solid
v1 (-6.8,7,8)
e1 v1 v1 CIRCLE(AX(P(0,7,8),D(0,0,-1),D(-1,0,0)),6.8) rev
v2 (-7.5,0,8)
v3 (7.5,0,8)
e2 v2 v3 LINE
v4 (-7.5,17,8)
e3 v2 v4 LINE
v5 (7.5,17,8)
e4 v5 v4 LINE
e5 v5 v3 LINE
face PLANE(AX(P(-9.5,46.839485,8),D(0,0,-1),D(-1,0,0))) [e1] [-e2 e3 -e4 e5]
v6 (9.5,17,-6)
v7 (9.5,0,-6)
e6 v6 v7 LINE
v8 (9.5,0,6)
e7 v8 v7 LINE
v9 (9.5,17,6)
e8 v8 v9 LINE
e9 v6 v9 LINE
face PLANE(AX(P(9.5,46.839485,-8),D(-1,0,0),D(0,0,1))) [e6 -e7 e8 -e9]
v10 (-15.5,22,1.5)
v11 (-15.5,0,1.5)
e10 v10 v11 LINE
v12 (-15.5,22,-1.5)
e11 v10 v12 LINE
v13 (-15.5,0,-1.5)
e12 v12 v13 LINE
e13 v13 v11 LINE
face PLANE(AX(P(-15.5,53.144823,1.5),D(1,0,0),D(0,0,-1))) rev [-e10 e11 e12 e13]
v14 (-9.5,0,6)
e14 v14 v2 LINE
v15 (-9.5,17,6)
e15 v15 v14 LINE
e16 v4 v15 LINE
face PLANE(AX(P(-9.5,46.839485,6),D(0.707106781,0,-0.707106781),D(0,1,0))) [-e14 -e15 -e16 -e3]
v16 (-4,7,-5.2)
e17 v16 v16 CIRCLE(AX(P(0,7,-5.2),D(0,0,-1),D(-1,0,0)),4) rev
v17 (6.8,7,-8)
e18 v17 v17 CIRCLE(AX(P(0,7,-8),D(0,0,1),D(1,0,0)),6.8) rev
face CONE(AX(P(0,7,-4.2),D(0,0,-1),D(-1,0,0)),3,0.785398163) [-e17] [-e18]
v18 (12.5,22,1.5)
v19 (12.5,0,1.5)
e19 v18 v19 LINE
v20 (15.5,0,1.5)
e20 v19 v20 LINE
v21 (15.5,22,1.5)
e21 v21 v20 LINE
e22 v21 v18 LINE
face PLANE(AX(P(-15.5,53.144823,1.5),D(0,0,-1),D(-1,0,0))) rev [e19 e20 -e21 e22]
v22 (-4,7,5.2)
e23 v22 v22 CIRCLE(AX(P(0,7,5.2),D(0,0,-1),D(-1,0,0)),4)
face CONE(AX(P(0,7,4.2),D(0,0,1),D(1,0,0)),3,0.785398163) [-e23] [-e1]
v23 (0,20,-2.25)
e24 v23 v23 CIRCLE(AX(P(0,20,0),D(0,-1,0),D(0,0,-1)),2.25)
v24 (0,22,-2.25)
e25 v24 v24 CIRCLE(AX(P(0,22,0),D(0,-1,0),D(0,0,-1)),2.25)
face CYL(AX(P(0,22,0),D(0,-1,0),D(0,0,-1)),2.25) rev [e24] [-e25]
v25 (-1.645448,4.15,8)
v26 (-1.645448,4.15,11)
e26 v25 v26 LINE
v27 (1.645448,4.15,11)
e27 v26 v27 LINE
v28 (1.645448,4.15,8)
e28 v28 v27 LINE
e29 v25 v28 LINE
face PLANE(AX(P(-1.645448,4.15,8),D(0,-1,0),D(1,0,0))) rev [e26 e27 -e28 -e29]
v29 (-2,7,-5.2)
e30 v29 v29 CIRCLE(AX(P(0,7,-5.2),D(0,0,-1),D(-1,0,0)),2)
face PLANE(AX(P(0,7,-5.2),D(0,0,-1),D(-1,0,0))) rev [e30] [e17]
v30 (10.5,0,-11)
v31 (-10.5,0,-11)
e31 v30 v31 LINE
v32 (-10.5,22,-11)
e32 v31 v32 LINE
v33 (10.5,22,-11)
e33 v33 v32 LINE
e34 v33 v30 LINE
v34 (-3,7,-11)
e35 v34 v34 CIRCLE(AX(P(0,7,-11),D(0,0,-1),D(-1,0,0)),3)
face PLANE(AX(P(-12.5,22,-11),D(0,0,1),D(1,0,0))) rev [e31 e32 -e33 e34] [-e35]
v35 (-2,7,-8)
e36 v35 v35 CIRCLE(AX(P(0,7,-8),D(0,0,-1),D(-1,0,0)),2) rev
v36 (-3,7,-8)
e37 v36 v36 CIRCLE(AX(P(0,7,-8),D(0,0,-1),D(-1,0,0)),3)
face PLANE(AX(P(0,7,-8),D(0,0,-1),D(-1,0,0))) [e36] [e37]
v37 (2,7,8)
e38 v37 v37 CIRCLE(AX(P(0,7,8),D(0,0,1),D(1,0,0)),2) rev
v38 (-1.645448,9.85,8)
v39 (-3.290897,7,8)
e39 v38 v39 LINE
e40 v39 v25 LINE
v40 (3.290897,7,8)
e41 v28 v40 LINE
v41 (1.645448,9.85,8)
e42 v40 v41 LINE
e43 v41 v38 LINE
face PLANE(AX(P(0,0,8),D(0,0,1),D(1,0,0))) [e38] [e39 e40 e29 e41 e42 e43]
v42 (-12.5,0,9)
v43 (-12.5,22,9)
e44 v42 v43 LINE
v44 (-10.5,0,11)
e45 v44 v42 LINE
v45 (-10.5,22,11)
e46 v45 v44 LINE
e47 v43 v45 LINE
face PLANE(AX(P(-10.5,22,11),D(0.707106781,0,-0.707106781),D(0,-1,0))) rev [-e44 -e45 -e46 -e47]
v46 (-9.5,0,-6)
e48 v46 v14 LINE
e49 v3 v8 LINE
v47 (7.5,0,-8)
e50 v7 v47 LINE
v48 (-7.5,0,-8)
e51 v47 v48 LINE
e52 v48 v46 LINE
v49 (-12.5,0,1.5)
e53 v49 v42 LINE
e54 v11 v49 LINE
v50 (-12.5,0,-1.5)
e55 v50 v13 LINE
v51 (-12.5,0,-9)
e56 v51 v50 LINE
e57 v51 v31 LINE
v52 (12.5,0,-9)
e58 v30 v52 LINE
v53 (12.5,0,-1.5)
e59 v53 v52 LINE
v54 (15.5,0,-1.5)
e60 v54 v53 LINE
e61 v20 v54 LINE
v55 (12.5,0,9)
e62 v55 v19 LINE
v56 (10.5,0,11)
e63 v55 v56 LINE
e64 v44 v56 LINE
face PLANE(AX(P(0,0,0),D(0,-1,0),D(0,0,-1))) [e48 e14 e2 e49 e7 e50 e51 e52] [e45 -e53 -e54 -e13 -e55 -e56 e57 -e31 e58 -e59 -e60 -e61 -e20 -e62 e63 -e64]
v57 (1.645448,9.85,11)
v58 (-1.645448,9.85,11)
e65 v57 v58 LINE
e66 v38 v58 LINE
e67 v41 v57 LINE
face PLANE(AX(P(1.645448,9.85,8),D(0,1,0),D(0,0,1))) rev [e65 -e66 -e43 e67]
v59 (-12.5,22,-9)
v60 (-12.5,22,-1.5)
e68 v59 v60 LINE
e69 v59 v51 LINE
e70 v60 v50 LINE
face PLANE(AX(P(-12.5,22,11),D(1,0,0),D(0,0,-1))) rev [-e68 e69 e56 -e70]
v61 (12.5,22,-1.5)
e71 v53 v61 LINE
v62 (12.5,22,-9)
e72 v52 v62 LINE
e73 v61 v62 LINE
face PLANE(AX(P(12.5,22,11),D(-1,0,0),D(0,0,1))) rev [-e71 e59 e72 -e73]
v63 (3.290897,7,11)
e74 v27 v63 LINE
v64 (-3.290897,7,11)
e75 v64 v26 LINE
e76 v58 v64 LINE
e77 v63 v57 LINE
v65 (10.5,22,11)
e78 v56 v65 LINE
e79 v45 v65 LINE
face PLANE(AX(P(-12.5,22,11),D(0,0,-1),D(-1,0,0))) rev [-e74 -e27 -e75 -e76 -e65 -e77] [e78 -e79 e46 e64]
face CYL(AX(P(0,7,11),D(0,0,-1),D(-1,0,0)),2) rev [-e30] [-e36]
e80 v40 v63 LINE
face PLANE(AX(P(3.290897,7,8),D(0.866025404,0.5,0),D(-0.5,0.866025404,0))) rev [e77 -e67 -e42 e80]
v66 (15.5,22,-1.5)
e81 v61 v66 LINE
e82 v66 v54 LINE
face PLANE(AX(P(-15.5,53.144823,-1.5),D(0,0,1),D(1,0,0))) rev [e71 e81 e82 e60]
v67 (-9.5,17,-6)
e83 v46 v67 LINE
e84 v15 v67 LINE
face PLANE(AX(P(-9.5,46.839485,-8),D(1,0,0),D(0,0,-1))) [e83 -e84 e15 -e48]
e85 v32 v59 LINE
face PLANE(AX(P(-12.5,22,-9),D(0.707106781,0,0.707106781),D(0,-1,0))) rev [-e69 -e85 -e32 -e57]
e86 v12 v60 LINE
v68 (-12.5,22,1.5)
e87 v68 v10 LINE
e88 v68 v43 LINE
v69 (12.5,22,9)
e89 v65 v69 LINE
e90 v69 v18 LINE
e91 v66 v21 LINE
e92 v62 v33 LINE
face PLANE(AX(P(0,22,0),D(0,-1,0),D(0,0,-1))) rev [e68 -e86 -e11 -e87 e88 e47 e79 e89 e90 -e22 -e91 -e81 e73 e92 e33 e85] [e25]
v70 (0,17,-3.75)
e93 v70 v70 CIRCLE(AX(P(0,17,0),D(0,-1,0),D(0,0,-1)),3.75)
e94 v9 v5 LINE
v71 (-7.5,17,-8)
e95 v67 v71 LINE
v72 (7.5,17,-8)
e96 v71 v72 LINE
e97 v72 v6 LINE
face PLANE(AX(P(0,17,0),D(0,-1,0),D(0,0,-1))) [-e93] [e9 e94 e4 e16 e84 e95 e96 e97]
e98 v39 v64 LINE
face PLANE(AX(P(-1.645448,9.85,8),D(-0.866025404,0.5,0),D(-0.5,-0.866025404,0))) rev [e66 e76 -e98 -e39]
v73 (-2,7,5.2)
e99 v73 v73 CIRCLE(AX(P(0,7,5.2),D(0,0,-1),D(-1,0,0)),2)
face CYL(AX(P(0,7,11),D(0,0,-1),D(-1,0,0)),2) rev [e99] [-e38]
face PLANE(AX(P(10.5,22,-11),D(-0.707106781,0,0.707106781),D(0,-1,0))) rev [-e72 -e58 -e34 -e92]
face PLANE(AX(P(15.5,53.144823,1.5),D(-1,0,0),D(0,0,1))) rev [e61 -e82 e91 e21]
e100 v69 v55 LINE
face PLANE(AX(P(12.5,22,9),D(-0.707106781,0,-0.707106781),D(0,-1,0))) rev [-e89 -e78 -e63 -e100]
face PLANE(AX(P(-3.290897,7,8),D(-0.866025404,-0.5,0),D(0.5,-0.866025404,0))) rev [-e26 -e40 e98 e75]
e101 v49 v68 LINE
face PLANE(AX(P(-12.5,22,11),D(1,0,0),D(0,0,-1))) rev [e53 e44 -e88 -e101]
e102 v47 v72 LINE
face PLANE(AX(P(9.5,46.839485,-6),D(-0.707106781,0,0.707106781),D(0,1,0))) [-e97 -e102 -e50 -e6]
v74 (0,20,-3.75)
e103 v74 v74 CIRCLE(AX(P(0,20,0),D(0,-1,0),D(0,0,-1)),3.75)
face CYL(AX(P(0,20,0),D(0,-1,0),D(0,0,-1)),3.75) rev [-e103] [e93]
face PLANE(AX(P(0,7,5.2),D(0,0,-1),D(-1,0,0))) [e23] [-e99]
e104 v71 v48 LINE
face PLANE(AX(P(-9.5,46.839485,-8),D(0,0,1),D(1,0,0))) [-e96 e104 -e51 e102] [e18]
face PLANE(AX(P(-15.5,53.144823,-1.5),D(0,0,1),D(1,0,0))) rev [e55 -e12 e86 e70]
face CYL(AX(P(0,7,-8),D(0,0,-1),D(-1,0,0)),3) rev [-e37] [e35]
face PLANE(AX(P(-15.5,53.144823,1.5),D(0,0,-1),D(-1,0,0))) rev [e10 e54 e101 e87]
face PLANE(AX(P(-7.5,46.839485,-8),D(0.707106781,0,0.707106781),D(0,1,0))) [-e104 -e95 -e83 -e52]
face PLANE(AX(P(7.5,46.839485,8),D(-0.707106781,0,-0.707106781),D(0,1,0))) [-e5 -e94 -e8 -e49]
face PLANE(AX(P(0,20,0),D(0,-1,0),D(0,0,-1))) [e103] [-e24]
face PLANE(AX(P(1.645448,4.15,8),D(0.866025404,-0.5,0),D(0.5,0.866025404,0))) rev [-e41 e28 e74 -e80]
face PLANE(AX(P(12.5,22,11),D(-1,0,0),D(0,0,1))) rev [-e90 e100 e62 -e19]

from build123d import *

# Parameters (mm, degrees)
SKETCH1_W           = 25
SKETCH1_H           = 22
BOSS_EXTRUDE1_DEPTH = 22
SKETCH3_W           = 31
SKETCH3_H           = 3
BOSS_EXTRUDE2_DEPTH = 22
SKETCH4_W           = 19
SKETCH4_H           = 16
CUT_EXTRUDE3_DEPTH  = 17
SKETCH5_R           = 3
BOSS_EXTRUDE3_DEPTH = 2.8
BOSS_EXTRUDE4_START = 2.8
SKETCH6_R           = 3
BOSS_EXTRUDE4_DEPTH = 2.8
SKETCH7_R           = 2
CUT_EXTRUDE4_DEPTH  = 35.759890679
CHAMFER1_SIZE       = 3.8
SKETCH8_R           = 3
CUT_EXTRUDE5_DEPTH  = 3
CUT_EXTRUDE6_DEPTH  = 3
CHAMFER2_SIZE       = 2
SKETCH10_R          = 3.75
CUT_EXTRUDE7_DEPTH  = 3
SKETCH11_R          = 2.25
CUT_EXTRUDE8_DEPTH  = 28.590759323


with BuildPart() as part:
    # Sketch1 → Boss-Extrude1 (new body)
    with BuildSketch(Plane(origin=(0, 0, 0), x_dir=(1, 0, 0), z_dir=(0, 1, 0))):
        Rectangle(SKETCH1_W, SKETCH1_H)
    extrude(amount=BOSS_EXTRUDE1_DEPTH)

    # Sketch3 → Boss-Extrude2 (add)
    with BuildSketch(Plane(origin=(0, 0, 0), x_dir=(1, 0, 0), z_dir=(0, 1, 0))):
        Rectangle(SKETCH3_W, SKETCH3_H)
    extrude(amount=BOSS_EXTRUDE2_DEPTH)

    # Sketch4 → Cut-Extrude3 (cut)
    with BuildSketch(Plane(origin=(0, 0, 0), x_dir=(1, 0, 0), z_dir=(0, 1, 0))):
        Rectangle(SKETCH4_W, SKETCH4_H)
    extrude(amount=CUT_EXTRUDE3_DEPTH, mode=Mode.SUBTRACT)

    # Sketch5 → Boss-Extrude3 (add)
    with BuildSketch(Plane(origin=(0, 0, -8), x_dir=(-1, 0, 0), z_dir=(0, 0, -1))):
        with Locations((0, 7)):
            Circle(SKETCH5_R)
    extrude(amount=-BOSS_EXTRUDE3_DEPTH)

    # Sketch6 → Boss-Extrude4 (add)
    with BuildSketch(Plane(origin=(0, 0, 8), x_dir=(-1, 0, 0), z_dir=(0, 0, -1)).offset(BOSS_EXTRUDE4_START)):
        with Locations((0, 7)):
            Circle(SKETCH6_R)
    extrude(amount=-BOSS_EXTRUDE4_DEPTH)

    # Sketch7 → Cut-Extrude4 (cut, through all)
    with BuildSketch(Plane(origin=(0, 0, -11), x_dir=(-1, 0, 0), z_dir=(0, 0, -1))):
        with Locations((0, 7)):
            Circle(SKETCH7_R)
    extrude(amount=-CUT_EXTRUDE4_DEPTH, mode=Mode.SUBTRACT)

    # Chamfer1
    # the kernel refuses this chamfer: 3.8 mm, written as the material it adds along each edge
    with BuildSketch(Plane(origin=(0, 7, 8), x_dir=(-1, 0, 0), z_dir=(0, -1, 0))) as chamfer1_piece_1_section:
        Polygon((3 + CHAMFER1_SIZE, 0), (3, CHAMFER1_SIZE), (3, 0), align=None)
    chamfer1_piece_1 = revolve(axis=Axis((0, 7, 8), (0, 0, -1)), mode=Mode.PRIVATE)
    chamfer1_piece_1 = split(chamfer1_piece_1, bisect_by=Plane(origin=(5.412454592, 7, 5.2), z_dir=(0, 0, 1)), keep=Keep.TOP, mode=Mode.PRIVATE)
    add(chamfer1_piece_1)
    with BuildSketch(Plane(origin=(0, 7, -8), x_dir=(-1, 0, 0), z_dir=(0, -1, 0))) as chamfer1_piece_2_section:
        Polygon((3 + CHAMFER1_SIZE, 0), (3, -CHAMFER1_SIZE), (3, 0), align=None)
    chamfer1_piece_2 = revolve(axis=Axis((0, 7, -8), (0, 0, -1)), mode=Mode.PRIVATE)
    chamfer1_piece_2 = split(chamfer1_piece_2, bisect_by=Plane(origin=(5.412454592, 7, -5.2), z_dir=(0, 0, -1)), keep=Keep.TOP, mode=Mode.PRIVATE)
    add(chamfer1_piece_2)

    # Sketch8 → Cut-Extrude5 (cut)
    with BuildSketch(Plane(origin=(0, 0, -11), x_dir=(-1, 0, 0), z_dir=(0, 0, -1))):
        with Locations((0, 7)):
            Circle(SKETCH8_R)
    extrude(amount=-CUT_EXTRUDE5_DEPTH, mode=Mode.SUBTRACT)

    # Sketch9 → Cut-Extrude6 (cut)
    with BuildSketch(Plane.XY.offset(11)):
        Polygon((1.645448267, 9.85), (-1.645448267, 9.85), (-3.290896534, 7), (-1.645448267, 4.15), (1.645448267, 4.15), (3.290896534, 7), align=None)
    extrude(amount=-CUT_EXTRUDE6_DEPTH, mode=Mode.SUBTRACT)

    # Chamfer2
    chamfer2_edges = [part.edges().sort_by_distance(p)[0] for p in [
        (-9.5, 8.5, 8),
        (-9.5, 8.5, -8),
        (9.5, 8.5, -8),
        (9.5, 8.5, 8),
        (12.5, 11, 11),
        (-12.5, 11, 11),
        (-12.5, 11, -11),
        (12.5, 11, -11),
    ]]
    chamfer(chamfer2_edges, length=CHAMFER2_SIZE)

    # Sketch10 → Cut-Extrude7 (cut)
    with BuildSketch(Plane.XZ.offset(-17)):
        with Locations(Location((0, 0, 0), (0, 0, 270))):
            Circle(SKETCH10_R)
    extrude(amount=-CUT_EXTRUDE7_DEPTH, mode=Mode.SUBTRACT)

    # Sketch11 → Cut-Extrude8 (cut, through all)
    with BuildSketch(Plane.XZ.offset(-20)):
        with Locations(Location((0, 0, 0), (0, 0, 270))):
            Circle(SKETCH11_R)
    extrude(amount=-CUT_EXTRUDE8_DEPTH, mode=Mode.SUBTRACT)


solid = part.part
